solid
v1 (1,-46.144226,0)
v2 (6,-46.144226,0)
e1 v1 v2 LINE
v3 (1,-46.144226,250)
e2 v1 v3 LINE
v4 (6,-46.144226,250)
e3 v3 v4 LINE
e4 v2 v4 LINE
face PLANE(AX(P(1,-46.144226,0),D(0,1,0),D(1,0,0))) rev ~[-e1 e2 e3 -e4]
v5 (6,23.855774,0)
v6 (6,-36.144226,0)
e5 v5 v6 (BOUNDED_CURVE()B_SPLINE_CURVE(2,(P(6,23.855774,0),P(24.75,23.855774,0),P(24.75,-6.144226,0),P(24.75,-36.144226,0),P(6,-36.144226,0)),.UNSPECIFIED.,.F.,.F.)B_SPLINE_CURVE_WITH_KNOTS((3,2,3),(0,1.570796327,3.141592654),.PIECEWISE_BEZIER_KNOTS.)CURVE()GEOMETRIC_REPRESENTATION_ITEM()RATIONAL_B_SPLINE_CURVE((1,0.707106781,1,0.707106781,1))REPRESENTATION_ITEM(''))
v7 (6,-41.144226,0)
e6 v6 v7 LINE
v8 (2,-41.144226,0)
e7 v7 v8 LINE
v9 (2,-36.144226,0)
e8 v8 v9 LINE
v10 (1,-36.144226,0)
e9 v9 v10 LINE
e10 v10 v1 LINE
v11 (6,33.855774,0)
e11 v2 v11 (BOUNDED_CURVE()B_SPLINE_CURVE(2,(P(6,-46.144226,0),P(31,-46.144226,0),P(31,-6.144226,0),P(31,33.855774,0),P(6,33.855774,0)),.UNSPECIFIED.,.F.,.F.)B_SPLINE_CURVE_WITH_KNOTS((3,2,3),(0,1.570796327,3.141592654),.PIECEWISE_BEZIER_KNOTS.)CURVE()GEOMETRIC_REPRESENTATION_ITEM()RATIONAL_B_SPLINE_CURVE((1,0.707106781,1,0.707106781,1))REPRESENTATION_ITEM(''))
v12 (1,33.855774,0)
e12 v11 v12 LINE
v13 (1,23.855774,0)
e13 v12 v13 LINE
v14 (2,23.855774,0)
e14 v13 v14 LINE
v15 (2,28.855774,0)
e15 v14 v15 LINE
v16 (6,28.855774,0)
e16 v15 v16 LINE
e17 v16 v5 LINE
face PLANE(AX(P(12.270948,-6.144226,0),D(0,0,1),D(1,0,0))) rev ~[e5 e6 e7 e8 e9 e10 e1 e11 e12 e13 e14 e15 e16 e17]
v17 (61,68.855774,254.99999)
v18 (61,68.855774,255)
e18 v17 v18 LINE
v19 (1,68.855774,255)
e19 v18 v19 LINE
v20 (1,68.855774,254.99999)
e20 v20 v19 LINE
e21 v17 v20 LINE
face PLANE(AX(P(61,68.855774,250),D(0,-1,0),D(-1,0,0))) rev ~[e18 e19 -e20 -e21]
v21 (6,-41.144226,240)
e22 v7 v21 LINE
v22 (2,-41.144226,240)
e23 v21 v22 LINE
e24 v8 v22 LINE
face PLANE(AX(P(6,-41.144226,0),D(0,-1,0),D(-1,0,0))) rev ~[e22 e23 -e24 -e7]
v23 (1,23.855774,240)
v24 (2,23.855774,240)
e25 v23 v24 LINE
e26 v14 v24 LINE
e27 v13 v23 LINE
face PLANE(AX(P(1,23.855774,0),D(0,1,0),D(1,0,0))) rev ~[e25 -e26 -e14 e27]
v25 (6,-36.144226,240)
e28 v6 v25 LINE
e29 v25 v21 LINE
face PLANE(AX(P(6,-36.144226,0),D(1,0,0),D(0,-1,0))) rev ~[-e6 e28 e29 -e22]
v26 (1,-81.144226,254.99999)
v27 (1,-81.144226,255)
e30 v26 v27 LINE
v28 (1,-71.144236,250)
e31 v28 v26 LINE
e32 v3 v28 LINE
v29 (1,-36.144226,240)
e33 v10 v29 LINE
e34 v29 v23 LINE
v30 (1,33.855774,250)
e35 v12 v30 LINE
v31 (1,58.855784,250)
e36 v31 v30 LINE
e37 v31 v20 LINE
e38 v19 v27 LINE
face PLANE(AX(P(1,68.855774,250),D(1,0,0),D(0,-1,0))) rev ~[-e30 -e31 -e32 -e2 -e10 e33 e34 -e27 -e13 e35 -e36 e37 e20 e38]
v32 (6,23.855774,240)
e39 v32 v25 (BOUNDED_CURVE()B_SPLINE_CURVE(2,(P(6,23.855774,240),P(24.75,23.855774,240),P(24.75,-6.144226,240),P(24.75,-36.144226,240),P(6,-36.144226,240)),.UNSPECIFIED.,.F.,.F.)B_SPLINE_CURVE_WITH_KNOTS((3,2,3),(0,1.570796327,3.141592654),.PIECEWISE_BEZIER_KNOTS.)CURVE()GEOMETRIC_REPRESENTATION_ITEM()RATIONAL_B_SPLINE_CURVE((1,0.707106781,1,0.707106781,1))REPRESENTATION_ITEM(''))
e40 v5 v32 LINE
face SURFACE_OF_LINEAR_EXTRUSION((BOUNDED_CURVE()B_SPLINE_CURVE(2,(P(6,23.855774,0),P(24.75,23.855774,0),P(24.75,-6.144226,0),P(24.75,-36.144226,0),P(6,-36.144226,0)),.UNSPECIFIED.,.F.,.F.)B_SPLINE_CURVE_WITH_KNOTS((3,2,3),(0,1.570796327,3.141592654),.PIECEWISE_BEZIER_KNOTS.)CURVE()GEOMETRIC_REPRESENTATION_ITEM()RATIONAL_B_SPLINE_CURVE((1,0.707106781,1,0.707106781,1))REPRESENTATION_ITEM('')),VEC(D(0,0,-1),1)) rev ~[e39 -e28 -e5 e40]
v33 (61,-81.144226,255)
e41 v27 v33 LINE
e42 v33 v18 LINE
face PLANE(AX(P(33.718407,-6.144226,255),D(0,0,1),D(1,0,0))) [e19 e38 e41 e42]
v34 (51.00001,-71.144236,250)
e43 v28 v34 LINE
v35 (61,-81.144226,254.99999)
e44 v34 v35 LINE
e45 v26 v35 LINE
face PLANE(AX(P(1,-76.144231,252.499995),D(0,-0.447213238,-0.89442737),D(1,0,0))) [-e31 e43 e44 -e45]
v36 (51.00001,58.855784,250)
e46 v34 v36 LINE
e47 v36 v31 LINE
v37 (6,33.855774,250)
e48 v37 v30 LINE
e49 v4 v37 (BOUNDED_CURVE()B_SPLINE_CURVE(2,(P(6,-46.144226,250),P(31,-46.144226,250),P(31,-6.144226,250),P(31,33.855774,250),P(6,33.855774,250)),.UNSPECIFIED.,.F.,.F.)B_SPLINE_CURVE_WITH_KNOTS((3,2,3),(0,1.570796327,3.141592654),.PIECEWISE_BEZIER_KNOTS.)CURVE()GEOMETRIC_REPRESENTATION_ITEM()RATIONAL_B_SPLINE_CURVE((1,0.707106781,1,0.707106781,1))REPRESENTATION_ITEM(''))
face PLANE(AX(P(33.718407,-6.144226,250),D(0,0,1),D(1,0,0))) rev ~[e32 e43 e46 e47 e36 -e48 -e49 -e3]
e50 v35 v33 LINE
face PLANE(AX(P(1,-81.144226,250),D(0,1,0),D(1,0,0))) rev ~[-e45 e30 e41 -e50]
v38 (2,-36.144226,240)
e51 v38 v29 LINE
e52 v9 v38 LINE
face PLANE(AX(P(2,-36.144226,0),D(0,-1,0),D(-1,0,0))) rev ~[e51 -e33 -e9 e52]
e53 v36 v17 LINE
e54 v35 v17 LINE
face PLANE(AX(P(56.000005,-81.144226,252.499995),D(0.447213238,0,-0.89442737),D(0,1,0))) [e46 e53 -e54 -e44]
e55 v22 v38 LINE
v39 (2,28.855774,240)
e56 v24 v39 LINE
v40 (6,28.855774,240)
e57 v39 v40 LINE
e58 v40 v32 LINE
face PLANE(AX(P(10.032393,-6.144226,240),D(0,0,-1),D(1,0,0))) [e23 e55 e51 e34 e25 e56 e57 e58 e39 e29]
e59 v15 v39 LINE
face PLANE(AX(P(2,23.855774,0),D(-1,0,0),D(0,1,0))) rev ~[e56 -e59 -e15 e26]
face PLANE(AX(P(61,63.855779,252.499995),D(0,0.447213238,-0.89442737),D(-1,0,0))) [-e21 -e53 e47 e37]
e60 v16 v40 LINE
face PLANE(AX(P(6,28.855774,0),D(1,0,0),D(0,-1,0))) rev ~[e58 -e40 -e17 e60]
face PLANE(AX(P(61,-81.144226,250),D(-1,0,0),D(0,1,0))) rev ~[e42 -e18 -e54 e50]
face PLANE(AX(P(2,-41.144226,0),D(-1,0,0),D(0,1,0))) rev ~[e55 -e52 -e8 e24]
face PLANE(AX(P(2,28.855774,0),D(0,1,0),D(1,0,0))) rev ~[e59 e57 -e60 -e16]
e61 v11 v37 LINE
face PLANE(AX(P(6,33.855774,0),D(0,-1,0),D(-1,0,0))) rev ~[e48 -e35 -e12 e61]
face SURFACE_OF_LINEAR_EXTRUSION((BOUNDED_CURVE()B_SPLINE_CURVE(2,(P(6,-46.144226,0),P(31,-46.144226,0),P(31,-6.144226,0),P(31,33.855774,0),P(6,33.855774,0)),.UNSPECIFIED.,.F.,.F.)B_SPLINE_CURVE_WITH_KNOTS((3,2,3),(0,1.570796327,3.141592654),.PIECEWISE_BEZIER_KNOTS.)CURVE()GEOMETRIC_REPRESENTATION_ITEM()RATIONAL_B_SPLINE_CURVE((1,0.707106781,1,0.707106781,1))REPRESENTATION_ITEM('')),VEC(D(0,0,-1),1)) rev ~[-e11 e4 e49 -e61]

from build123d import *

# Parameters (mm, degrees)
F1_DEPTH = 250
F3_DEPTH = 5
F4_SIZE2 = 4.99999
F4_SIZE  = 9.99999
F6_DEPTH = 240


# Not quite as in the source:
# - a fillet or chamfer is up to 0.001 mm smaller than in the source, because OpenCascade refuses the exact size
# - a feature names something its author has since deleted; it is built from what else it names


with BuildPart() as f1:
    # F0 (on Top) → F1 (new body)
    with BuildSketch(Plane.XY):
        with BuildLine():
            Line((1.0000000522, -46.1442264915), (6.0000000522, -46.1442264915))
            add(Edge.make_bspline(
                [(6, -46.1442264915), (31, -46.1442264915), (31, -6.1442264915), (31, 33.8557735085), (6, 33.8557735085)],
                knots=[0, 0, 0, 1.5707963268, 1.5707963268, 3.1415926536, 3.1415926536, 3.1415926536], degree=2, weights=[1, 0.7071067812, 1, 0.7071067812, 1]))
            Line((6.0000000522, 33.8557735085), (1.0000000522, 33.8557735085))
            Line((1.0000000522, 33.8557735085), (1.0000000522, -46.1442264915))
        make_face()
    extrude(amount=F1_DEPTH)

    # F2 (on face) → F3 (join)
    with BuildSketch(Plane.XY.offset(250)):
        with BuildLine():
            Line((61.0000000522, -81.1442264915), (61.0000000522, 68.8557735085))
            Line((61.0000000522, 68.8557735085), (1.0000000522, 68.8557735085))
            Line((1.0000000522, 68.8557735085), (1.0000000522, 33.8557735085))
            Line((1.0000000522, 33.8557735085), (6.0000000522, 33.8557735085))
            add(Edge.make_bspline(
                [(6, -46.1442264915), (31, -46.1442264915), (31, -6.1442264915), (31, 33.8557735085), (6, 33.8557735085)],
                knots=[0, 0, 0, 1.5707963268, 1.5707963268, 3.1415926536, 3.1415926536, 3.1415926536], degree=2, weights=[1, 0.7071067812, 1, 0.7071067812, 1]))
            Line((6.0000000522, -46.1442264915), (1.0000000522, -46.1442264915))
            Line((1.0000000522, -46.1442264915), (1.0000000522, -81.1442264915))
            Line((1.0000000522, -81.1442264915), (61.0000000522, -81.1442264915))
        make_face()
        with BuildLine():
            Line((6.0000000522, 33.8557735085), (1.0000000522, 33.8557735085))
            Line((1.0000000522, 33.8557735085), (1.0000000522, -46.1442264915))
            Line((1.0000000522, -46.1442264915), (6.0000000522, -46.1442264915))
            add(Edge.make_bspline(
                [(6, -46.1442264915), (31, -46.1442264915), (31, -6.1442264915), (31, 33.8557735085), (6, 33.8557735085)],
                knots=[0, 0, 0, 1.5707963268, 1.5707963268, 3.1415926536, 3.1415926536, 3.1415926536], degree=2, weights=[1, 0.7071067812, 1, 0.7071067812, 1]))
        make_face()
    extrude(amount=F3_DEPTH)

    # F4 (size 10 and 5 in the source; OpenCascade refuses exactly that, so slightly less here)
    f4_edges = [f1.edges().sort_by_distance(p)[0] for p in [
        (31, 68.855774, 250),
        (61, -6.144226, 250),
        (31, -81.144226, 250),
    ]]
    f4_side = f1.faces().sort_by_distance((35.795895, -6.144226, 250))[0]
    chamfer(f4_edges, length=F4_SIZE, length2=F4_SIZE2, reference=f4_side)

    # F5 (on face) → F6 (cut)
    with BuildSketch(Plane(origin=(0, 0, 0), x_dir=(1, 0, 0), z_dir=(0, 0, -1))):
        with BuildLine():
            Line((3.5000000522, -23.8557735085), (6.0000000522, -23.8557735085))
            add(Edge.make_bspline(
                [(6, -23.8557735085), (24.75, -23.8557735085), (24.75, 6.1442264915), (24.75, 36.1442264915), (6, 36.1442264915)],
                knots=[0, 0, 0, 1.5707963268, 1.5707963268, 3.1415926536, 3.1415926536, 3.1415926536], degree=2, weights=[1, 0.7071067812, 1, 0.7071067812, 1]))
            Line((6.0000000522, 36.1442264915), (3.5000000522, 36.1442264915))
            Line((3.5000000522, 36.1442264915), (2.0000000522, 36.1442264915))
            Line((2.0000000522, 36.1442264915), (1.0000000522, 36.1442264915))
            Line((1.0000000522, 36.1442264915), (1.0000000522, 6.1442264915))
            Line((1.0000000522, 6.1442264915), (1.0000000522, -23.8557735085))
            Line((1.0000000522, -23.8557735085), (2.0000000522, -23.8557735085))
            Line((2.0000000522, -23.8557735085), (3.5000000522, -23.8557735085))
        make_face()
        Polygon((6.0000000522, -28.8557735085), (6.0000000522, -23.8557735085), (3.5000000522, -23.8557735085), (2.0000000522, -23.8557735085), (2.0000000522, -28.8557735085), align=None)
        Polygon((3.5000000522, 36.1442264915), (6.0000000522, 36.1442264915), (6.0000000522, 41.1442264915), (2.0000000522, 41.1442264915), (2.0000000522, 36.1442264915), align=None)
    extrude(amount=-F6_DEPTH, mode=Mode.SUBTRACT)


solid = f1.part
